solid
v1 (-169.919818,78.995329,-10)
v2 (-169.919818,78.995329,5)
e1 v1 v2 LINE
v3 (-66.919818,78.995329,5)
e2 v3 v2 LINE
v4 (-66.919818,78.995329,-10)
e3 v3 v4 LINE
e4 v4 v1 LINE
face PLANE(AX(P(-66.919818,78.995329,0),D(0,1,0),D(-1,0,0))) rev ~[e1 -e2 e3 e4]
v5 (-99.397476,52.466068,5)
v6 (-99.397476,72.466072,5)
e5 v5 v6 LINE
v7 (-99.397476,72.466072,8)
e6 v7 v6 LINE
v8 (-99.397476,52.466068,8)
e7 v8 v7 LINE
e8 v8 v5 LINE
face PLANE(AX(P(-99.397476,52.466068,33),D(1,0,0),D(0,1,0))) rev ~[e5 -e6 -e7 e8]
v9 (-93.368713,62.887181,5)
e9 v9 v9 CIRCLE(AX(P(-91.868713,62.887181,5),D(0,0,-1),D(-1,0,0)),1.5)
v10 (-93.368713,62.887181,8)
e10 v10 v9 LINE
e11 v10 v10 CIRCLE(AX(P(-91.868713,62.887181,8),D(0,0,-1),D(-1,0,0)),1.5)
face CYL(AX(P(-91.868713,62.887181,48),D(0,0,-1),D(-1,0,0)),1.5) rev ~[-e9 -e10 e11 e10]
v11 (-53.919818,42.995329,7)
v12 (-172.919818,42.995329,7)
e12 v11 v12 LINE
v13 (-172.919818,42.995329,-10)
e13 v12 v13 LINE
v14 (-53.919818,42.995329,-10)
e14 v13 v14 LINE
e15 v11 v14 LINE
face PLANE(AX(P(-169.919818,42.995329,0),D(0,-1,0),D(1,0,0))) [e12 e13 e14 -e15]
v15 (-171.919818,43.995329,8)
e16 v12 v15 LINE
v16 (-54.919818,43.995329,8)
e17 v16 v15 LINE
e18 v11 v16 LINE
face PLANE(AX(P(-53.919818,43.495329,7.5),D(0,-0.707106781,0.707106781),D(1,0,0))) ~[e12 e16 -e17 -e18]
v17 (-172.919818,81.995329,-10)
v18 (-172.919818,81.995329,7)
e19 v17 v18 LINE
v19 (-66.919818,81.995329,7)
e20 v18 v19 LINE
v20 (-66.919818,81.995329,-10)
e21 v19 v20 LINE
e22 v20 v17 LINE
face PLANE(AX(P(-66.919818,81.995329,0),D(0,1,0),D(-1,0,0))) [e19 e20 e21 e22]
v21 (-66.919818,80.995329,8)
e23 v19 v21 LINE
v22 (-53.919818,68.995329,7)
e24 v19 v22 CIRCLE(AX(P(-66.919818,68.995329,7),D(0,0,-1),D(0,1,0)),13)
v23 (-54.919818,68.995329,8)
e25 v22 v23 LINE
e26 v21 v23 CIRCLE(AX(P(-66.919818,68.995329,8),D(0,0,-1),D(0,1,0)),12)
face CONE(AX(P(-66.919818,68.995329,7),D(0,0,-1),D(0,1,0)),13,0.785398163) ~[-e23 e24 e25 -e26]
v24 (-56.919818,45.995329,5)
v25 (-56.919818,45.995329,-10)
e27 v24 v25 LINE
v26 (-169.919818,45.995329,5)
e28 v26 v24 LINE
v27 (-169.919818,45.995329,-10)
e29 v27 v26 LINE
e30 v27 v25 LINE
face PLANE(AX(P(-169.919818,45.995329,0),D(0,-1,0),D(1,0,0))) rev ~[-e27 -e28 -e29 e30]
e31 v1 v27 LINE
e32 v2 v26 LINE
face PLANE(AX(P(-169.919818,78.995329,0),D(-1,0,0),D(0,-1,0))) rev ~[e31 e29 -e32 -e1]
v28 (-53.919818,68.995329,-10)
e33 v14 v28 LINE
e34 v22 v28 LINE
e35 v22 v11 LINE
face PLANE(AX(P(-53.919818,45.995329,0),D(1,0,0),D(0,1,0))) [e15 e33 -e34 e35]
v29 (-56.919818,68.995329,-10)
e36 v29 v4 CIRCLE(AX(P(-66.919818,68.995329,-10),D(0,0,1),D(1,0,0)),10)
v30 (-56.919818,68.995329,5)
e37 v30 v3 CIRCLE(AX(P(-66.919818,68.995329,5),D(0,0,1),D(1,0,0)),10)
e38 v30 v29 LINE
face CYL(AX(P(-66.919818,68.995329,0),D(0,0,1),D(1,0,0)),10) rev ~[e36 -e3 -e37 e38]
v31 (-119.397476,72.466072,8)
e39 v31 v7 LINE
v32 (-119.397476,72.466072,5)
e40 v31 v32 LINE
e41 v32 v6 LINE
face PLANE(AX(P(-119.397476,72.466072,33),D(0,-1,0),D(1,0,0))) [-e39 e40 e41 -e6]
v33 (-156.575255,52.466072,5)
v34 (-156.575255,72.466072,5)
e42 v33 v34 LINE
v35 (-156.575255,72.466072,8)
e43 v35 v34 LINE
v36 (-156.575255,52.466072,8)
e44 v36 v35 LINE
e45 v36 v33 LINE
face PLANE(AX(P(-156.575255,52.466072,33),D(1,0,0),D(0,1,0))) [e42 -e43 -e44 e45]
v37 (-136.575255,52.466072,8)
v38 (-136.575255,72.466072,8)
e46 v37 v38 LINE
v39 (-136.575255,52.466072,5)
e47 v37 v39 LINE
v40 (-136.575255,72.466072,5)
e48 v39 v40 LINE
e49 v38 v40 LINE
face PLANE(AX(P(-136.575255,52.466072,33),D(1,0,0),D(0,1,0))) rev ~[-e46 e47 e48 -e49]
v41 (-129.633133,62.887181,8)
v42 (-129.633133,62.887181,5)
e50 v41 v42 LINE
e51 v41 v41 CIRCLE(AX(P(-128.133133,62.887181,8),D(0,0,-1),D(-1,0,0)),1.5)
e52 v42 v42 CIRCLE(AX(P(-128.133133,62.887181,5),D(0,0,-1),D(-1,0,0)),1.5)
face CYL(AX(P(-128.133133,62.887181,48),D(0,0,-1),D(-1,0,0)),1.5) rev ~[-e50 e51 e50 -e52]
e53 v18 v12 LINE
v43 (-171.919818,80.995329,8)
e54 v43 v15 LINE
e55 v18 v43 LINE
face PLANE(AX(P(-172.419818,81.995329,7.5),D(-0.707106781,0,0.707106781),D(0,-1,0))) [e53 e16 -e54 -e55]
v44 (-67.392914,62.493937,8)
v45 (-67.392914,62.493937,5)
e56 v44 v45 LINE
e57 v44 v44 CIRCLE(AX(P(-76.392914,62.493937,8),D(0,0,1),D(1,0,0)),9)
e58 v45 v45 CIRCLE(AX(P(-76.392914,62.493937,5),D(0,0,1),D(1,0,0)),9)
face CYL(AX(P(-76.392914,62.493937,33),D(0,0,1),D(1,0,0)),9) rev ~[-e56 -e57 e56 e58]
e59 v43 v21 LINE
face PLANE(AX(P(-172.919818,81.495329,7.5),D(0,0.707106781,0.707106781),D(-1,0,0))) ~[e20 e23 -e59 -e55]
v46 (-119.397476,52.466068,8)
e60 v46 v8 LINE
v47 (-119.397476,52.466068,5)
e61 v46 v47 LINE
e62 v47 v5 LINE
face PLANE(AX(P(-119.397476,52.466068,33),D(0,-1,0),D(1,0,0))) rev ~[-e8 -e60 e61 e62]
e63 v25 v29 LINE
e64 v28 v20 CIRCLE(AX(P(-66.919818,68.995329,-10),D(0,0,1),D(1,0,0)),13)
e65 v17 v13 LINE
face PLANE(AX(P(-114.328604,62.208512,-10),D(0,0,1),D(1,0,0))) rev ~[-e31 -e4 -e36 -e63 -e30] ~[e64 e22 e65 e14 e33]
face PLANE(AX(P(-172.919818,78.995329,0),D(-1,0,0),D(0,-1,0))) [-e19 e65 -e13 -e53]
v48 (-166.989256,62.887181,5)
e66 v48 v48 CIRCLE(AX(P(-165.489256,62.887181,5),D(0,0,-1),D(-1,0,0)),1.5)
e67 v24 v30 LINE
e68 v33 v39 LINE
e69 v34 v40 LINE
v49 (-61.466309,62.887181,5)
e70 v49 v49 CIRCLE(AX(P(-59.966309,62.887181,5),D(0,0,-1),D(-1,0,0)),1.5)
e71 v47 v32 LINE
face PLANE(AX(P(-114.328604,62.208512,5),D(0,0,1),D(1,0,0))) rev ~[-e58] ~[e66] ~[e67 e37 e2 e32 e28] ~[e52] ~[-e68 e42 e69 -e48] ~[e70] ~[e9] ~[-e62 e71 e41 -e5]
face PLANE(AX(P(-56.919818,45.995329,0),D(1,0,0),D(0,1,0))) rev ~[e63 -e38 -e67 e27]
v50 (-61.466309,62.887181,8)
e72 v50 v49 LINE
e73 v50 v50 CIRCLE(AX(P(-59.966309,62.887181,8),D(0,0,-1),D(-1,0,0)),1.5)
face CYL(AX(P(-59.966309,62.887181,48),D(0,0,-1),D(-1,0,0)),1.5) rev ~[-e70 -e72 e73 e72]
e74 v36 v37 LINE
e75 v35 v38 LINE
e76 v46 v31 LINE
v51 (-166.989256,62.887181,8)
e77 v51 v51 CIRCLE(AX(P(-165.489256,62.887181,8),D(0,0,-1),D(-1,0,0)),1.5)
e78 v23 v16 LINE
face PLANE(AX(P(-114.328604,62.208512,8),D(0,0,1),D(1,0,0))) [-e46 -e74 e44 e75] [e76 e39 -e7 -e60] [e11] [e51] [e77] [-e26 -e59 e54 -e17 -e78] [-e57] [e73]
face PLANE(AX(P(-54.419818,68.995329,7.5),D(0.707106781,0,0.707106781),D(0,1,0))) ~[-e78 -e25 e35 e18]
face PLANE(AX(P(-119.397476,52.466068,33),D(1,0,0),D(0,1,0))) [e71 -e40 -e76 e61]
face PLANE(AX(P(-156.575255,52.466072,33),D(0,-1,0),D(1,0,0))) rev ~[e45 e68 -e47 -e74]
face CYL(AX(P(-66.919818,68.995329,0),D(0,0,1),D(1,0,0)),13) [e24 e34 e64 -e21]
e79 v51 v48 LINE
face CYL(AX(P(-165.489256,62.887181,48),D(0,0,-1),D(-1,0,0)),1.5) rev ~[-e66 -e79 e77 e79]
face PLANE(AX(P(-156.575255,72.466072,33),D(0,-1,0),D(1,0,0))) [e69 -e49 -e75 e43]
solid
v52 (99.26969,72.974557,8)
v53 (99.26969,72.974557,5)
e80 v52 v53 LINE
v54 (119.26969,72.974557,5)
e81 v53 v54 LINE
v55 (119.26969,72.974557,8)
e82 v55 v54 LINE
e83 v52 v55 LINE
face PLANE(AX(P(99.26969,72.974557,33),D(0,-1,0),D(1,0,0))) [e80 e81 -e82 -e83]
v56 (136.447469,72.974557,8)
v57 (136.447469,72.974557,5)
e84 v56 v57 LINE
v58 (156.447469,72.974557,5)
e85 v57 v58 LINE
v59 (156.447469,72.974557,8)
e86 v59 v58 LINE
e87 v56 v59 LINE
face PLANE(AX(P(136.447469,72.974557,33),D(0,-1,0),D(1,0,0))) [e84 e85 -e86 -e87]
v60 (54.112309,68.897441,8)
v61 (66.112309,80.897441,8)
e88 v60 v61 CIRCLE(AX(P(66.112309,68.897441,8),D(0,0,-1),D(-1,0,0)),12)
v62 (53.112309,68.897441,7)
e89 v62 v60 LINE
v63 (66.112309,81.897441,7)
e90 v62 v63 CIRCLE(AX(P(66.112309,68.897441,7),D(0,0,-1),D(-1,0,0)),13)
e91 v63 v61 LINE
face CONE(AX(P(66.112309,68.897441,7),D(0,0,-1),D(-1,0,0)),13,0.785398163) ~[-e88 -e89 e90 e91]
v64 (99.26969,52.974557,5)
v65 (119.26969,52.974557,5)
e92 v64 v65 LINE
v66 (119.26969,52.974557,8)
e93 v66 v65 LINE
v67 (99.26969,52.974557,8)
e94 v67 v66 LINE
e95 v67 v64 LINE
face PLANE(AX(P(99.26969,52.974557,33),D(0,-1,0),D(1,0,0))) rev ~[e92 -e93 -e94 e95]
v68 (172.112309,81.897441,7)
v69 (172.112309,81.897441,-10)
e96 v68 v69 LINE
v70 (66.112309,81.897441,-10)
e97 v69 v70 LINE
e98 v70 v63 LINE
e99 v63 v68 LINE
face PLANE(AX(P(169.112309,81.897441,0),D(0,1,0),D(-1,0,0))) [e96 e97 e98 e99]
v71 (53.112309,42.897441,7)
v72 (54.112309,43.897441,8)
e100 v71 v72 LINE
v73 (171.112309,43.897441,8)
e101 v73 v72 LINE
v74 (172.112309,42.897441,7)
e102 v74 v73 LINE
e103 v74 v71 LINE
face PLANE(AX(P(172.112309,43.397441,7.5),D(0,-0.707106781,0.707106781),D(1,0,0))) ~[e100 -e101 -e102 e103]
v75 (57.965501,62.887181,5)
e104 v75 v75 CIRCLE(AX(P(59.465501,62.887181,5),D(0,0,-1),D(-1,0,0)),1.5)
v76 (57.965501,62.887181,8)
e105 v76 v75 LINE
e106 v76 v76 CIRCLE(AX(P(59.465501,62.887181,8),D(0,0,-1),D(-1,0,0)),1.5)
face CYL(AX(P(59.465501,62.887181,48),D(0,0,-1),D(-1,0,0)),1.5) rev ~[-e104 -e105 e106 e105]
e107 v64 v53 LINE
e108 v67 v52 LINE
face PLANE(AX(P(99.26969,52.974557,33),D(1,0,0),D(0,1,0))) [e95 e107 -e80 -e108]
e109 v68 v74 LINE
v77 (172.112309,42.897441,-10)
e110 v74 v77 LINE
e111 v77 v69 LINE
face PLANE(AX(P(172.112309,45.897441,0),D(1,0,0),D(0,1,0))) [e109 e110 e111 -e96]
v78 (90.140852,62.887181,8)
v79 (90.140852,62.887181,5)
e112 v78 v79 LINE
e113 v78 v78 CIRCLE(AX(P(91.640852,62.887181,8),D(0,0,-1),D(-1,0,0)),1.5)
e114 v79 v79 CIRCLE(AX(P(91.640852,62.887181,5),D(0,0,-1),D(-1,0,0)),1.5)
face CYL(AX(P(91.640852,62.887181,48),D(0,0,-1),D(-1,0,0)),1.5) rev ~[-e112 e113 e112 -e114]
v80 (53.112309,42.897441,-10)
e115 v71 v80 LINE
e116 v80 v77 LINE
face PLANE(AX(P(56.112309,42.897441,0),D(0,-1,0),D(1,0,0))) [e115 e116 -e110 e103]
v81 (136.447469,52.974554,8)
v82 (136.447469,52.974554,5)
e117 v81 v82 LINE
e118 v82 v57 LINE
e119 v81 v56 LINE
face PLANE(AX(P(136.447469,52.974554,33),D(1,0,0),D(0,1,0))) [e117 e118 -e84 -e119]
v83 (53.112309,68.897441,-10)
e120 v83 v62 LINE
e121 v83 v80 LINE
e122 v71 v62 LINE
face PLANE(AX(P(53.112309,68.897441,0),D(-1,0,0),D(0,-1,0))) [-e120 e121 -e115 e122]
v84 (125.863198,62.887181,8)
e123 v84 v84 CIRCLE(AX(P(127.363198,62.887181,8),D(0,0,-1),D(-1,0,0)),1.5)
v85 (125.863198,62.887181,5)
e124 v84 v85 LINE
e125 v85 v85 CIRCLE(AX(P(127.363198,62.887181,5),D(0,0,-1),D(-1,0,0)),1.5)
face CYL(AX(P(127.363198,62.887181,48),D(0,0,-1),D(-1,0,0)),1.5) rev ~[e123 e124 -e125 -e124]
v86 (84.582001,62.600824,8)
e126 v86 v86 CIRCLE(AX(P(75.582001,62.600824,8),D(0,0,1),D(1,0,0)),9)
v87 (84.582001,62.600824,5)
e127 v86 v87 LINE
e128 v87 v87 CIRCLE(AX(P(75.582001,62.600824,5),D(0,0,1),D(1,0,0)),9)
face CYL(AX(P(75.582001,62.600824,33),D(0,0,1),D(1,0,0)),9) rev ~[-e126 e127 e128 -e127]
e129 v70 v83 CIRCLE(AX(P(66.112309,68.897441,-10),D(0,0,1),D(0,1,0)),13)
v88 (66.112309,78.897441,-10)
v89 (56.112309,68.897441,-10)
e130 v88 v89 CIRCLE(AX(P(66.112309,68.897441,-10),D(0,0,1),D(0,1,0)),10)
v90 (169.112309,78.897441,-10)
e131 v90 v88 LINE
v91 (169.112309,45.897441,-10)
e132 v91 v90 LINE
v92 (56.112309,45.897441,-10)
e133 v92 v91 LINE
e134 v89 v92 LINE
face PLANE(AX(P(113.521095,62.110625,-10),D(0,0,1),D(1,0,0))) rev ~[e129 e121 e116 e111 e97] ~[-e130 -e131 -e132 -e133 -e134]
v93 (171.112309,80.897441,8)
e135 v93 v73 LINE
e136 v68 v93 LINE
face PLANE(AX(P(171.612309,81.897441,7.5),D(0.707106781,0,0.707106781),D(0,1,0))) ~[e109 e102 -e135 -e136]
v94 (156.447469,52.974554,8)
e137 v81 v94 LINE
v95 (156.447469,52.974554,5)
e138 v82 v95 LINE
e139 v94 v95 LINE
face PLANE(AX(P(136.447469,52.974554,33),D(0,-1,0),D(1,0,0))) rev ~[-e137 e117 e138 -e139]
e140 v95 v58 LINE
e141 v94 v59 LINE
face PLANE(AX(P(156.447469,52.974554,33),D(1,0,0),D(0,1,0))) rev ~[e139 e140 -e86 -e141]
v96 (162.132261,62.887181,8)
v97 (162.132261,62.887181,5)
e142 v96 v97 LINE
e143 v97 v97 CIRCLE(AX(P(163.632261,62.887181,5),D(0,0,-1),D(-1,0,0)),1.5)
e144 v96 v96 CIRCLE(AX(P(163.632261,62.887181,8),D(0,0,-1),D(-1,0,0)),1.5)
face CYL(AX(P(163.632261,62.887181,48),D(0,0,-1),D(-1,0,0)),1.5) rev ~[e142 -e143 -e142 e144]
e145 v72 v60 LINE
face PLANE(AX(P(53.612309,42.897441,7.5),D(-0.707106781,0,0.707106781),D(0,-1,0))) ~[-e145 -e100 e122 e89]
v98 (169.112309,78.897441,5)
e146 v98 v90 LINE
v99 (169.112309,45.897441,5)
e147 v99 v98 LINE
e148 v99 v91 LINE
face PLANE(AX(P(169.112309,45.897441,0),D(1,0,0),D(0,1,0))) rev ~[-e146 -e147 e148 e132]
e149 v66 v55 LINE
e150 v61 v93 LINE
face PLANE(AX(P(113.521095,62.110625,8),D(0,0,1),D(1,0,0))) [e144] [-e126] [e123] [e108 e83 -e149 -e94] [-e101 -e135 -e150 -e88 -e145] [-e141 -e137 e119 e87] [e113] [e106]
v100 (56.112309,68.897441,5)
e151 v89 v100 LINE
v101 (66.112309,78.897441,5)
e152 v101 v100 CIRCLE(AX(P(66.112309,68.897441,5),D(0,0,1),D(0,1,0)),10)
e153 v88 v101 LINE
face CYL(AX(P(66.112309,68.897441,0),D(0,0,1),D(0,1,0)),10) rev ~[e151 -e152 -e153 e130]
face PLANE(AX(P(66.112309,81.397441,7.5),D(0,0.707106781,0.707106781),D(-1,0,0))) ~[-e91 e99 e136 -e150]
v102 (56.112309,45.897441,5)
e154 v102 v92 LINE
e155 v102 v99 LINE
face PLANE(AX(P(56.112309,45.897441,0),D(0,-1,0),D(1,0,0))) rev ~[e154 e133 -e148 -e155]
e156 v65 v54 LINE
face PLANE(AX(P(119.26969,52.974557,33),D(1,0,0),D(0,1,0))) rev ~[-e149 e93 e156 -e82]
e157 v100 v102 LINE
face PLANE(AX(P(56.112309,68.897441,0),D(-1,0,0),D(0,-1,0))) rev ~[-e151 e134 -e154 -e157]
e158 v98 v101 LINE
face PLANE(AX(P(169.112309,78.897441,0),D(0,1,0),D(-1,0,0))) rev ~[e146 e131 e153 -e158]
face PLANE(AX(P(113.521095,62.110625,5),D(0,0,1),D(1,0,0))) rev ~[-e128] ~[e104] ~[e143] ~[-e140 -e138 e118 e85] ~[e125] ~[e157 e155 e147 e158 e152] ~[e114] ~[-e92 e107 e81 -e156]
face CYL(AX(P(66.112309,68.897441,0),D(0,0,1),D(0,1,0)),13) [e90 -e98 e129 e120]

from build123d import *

# Parameters (mm, degrees)
F1_DEPTH      = 5
F1_DEPTH_BACK = 10
F2_T          = 3
F2_2_T        = 3
F4_W          = 20
F4_H          = 20
F4_H_2        = 20.0000037253
F4_R          = 9
F5_DEPTH      = 50
F8_D          = 3
F8_DEPTH      = 40
F8_TIP        = 0.9012909285
F8_2_D        = 3
F8_2_DEPTH    = 40
F8_2_TIP      = 0.9012909285
F9_SIZE       = 1
F9_2_SIZE     = 1


with BuildPart() as f1:
    # F0 (on Top) → F1 (new body, two sides)
    with BuildSketch(Plane.XY) as f1_sk:
        with BuildLine():
            Line((169.1123094261, 78.8974409995), (66.1123094261, 78.8974409995))
            ThreePointArc((66.1123094261, 78.8974409995), (59.0412416142, 75.9685088113), (56.1123094261, 68.8974409995))
            Line((56.1123094261, 68.8974409995), (56.1123094261, 45.8974409995))
            Line((56.1123094261, 45.8974409995), (169.1123094261, 45.8974409995))
            Line((169.1123094261, 45.8974409995), (169.1123094261, 78.8974409995))
        make_face()
    extrude(amount=F1_DEPTH)
    extrude(f1_sk.sketch, amount=-F1_DEPTH_BACK)

    # F2
    f2_openings = [f1.faces().sort_by_distance(p)[0] for p in [
        (112.926417, 62.314864, -10),
    ]]
    offset(amount=F2_T, openings=f2_openings, kind=Kind.INTERSECTION)


with BuildPart() as f1b:
    # F0 (on Top) → F1, piece 2 (new body, two sides)
    with BuildSketch(Plane.XY) as f1_2_sk:
        with BuildLine():
            Line((-66.9198182523, 78.9953285099), (-169.9198182523, 78.9953285099))
            Line((-169.9198182523, 78.9953285099), (-169.9198182523, 45.9953285099))
            Line((-169.9198182523, 45.9953285099), (-56.9198182523, 45.9953285099))
            Line((-56.9198182523, 45.9953285099), (-56.9198182523, 68.9953285099))
            ThreePointArc((-56.9198182523, 68.9953285099), (-59.8487504405, 76.0663963218), (-66.9198182523, 78.9953285099))
        make_face()
    extrude(amount=F1_DEPTH)
    extrude(f1_2_sk.sketch, amount=-F1_DEPTH_BACK)

    # F2#2
    f2_2_openings = [f1b.faces().sort_by_distance(p)[0] for p in [
        (-113.733926, 62.412751, -10),
    ]]
    offset(amount=F2_2_T, openings=f2_2_openings, kind=Kind.INTERSECTION)


with BuildPart() as f5_tool:
    # F4 (on offset) → F5 (new body)
    with BuildSketch(Plane.XY.offset(33)):
        with Locations((-146.575255096, 62.4660721421)):
            Rectangle(F4_W, F4_H)
        with Locations((-109.3974763155, 62.4660702795)):
            Rectangle(F4_W, F4_H_2)
        with Locations((-76.3929139701, 62.4939369033)):
            Circle(F4_R)
        with Locations((75.5820007977, 62.6008242587)):
            Circle(F4_R)
        with Locations((109.2696897686, 62.9745572805)):
            Rectangle(F4_W, F4_H)
        with Locations((146.447468549, 62.9745554179)):
            Rectangle(F4_W, F4_H_2)
    extrude(amount=-F5_DEPTH)


with BuildPart() as f1_1:
    add(f1.part)

    # F5: cut by f5_tool
    add(f5_tool.part, mode=Mode.SUBTRACT)

    # F8
    with Locations(Plane.XY.offset(8)):
        with Locations((-128.1331330538, 62.8871805966), (163.6322605932, 62.8871805966), (127.36319817, 62.8871805966), (-165.489256382, 62.8871805966), (91.6408523917, 62.8871805966), (59.4655014575, 62.8871805966), (-91.8687133804, 62.8871805966), (-59.9663094311, 62.8871805966)):
            Hole(F8_D / 2, depth=F8_DEPTH)
            with Locations((0, 0, -(F8_DEPTH + F8_TIP / 2))):  # 118° drill point
                Cone(0, F8_D / 2, F8_TIP, mode=Mode.SUBTRACT)

    # F9
    f9_edges = [f1_1.edges().sort_by_distance(p)[0] for p in [
        (112.612309, 42.897441, 8),
        (172.112309, 62.397441, 8),
        (119.112309, 81.897441, 8),
        (56.919921, 78.089829, 8),
        (53.112309, 55.897441, 8),
    ]]
    chamfer(f9_edges, length=F9_SIZE)


with BuildPart() as f1b_1:
    add(f1b.part)

    # F5: cut by f5_tool
    add(f5_tool.part, mode=Mode.SUBTRACT)

    # F8#2
    with Locations(Plane.XY.offset(8)):
        with Locations((-128.1331330538, 62.8871805966), (163.6322605932, 62.8871805966), (127.36319817, 62.8871805966), (-165.489256382, 62.8871805966), (91.6408523917, 62.8871805966), (59.4655014575, 62.8871805966), (-91.8687133804, 62.8871805966), (-59.9663094311, 62.8871805966)):
            Hole(F8_2_D / 2, depth=F8_2_DEPTH)
            with Locations((0, 0, -(F8_2_DEPTH + F8_2_TIP / 2))):  # 118° drill point
                Cone(0, F8_2_D / 2, F8_2_TIP, mode=Mode.SUBTRACT)

    # F9#2
    f9_2_edges = [f1b_1.edges().sort_by_distance(p)[0] for p in [
        (-53.919818, 55.995329, 8),
        (-57.72743, 78.187717, 8),
        (-119.919818, 81.995329, 8),
        (-172.919818, 62.495329, 8),
        (-113.419818, 42.995329, 8),
    ]]
    chamfer(f9_2_edges, length=F9_2_SIZE)


solid = Compound([f1_1.part, f1b_1.part])
